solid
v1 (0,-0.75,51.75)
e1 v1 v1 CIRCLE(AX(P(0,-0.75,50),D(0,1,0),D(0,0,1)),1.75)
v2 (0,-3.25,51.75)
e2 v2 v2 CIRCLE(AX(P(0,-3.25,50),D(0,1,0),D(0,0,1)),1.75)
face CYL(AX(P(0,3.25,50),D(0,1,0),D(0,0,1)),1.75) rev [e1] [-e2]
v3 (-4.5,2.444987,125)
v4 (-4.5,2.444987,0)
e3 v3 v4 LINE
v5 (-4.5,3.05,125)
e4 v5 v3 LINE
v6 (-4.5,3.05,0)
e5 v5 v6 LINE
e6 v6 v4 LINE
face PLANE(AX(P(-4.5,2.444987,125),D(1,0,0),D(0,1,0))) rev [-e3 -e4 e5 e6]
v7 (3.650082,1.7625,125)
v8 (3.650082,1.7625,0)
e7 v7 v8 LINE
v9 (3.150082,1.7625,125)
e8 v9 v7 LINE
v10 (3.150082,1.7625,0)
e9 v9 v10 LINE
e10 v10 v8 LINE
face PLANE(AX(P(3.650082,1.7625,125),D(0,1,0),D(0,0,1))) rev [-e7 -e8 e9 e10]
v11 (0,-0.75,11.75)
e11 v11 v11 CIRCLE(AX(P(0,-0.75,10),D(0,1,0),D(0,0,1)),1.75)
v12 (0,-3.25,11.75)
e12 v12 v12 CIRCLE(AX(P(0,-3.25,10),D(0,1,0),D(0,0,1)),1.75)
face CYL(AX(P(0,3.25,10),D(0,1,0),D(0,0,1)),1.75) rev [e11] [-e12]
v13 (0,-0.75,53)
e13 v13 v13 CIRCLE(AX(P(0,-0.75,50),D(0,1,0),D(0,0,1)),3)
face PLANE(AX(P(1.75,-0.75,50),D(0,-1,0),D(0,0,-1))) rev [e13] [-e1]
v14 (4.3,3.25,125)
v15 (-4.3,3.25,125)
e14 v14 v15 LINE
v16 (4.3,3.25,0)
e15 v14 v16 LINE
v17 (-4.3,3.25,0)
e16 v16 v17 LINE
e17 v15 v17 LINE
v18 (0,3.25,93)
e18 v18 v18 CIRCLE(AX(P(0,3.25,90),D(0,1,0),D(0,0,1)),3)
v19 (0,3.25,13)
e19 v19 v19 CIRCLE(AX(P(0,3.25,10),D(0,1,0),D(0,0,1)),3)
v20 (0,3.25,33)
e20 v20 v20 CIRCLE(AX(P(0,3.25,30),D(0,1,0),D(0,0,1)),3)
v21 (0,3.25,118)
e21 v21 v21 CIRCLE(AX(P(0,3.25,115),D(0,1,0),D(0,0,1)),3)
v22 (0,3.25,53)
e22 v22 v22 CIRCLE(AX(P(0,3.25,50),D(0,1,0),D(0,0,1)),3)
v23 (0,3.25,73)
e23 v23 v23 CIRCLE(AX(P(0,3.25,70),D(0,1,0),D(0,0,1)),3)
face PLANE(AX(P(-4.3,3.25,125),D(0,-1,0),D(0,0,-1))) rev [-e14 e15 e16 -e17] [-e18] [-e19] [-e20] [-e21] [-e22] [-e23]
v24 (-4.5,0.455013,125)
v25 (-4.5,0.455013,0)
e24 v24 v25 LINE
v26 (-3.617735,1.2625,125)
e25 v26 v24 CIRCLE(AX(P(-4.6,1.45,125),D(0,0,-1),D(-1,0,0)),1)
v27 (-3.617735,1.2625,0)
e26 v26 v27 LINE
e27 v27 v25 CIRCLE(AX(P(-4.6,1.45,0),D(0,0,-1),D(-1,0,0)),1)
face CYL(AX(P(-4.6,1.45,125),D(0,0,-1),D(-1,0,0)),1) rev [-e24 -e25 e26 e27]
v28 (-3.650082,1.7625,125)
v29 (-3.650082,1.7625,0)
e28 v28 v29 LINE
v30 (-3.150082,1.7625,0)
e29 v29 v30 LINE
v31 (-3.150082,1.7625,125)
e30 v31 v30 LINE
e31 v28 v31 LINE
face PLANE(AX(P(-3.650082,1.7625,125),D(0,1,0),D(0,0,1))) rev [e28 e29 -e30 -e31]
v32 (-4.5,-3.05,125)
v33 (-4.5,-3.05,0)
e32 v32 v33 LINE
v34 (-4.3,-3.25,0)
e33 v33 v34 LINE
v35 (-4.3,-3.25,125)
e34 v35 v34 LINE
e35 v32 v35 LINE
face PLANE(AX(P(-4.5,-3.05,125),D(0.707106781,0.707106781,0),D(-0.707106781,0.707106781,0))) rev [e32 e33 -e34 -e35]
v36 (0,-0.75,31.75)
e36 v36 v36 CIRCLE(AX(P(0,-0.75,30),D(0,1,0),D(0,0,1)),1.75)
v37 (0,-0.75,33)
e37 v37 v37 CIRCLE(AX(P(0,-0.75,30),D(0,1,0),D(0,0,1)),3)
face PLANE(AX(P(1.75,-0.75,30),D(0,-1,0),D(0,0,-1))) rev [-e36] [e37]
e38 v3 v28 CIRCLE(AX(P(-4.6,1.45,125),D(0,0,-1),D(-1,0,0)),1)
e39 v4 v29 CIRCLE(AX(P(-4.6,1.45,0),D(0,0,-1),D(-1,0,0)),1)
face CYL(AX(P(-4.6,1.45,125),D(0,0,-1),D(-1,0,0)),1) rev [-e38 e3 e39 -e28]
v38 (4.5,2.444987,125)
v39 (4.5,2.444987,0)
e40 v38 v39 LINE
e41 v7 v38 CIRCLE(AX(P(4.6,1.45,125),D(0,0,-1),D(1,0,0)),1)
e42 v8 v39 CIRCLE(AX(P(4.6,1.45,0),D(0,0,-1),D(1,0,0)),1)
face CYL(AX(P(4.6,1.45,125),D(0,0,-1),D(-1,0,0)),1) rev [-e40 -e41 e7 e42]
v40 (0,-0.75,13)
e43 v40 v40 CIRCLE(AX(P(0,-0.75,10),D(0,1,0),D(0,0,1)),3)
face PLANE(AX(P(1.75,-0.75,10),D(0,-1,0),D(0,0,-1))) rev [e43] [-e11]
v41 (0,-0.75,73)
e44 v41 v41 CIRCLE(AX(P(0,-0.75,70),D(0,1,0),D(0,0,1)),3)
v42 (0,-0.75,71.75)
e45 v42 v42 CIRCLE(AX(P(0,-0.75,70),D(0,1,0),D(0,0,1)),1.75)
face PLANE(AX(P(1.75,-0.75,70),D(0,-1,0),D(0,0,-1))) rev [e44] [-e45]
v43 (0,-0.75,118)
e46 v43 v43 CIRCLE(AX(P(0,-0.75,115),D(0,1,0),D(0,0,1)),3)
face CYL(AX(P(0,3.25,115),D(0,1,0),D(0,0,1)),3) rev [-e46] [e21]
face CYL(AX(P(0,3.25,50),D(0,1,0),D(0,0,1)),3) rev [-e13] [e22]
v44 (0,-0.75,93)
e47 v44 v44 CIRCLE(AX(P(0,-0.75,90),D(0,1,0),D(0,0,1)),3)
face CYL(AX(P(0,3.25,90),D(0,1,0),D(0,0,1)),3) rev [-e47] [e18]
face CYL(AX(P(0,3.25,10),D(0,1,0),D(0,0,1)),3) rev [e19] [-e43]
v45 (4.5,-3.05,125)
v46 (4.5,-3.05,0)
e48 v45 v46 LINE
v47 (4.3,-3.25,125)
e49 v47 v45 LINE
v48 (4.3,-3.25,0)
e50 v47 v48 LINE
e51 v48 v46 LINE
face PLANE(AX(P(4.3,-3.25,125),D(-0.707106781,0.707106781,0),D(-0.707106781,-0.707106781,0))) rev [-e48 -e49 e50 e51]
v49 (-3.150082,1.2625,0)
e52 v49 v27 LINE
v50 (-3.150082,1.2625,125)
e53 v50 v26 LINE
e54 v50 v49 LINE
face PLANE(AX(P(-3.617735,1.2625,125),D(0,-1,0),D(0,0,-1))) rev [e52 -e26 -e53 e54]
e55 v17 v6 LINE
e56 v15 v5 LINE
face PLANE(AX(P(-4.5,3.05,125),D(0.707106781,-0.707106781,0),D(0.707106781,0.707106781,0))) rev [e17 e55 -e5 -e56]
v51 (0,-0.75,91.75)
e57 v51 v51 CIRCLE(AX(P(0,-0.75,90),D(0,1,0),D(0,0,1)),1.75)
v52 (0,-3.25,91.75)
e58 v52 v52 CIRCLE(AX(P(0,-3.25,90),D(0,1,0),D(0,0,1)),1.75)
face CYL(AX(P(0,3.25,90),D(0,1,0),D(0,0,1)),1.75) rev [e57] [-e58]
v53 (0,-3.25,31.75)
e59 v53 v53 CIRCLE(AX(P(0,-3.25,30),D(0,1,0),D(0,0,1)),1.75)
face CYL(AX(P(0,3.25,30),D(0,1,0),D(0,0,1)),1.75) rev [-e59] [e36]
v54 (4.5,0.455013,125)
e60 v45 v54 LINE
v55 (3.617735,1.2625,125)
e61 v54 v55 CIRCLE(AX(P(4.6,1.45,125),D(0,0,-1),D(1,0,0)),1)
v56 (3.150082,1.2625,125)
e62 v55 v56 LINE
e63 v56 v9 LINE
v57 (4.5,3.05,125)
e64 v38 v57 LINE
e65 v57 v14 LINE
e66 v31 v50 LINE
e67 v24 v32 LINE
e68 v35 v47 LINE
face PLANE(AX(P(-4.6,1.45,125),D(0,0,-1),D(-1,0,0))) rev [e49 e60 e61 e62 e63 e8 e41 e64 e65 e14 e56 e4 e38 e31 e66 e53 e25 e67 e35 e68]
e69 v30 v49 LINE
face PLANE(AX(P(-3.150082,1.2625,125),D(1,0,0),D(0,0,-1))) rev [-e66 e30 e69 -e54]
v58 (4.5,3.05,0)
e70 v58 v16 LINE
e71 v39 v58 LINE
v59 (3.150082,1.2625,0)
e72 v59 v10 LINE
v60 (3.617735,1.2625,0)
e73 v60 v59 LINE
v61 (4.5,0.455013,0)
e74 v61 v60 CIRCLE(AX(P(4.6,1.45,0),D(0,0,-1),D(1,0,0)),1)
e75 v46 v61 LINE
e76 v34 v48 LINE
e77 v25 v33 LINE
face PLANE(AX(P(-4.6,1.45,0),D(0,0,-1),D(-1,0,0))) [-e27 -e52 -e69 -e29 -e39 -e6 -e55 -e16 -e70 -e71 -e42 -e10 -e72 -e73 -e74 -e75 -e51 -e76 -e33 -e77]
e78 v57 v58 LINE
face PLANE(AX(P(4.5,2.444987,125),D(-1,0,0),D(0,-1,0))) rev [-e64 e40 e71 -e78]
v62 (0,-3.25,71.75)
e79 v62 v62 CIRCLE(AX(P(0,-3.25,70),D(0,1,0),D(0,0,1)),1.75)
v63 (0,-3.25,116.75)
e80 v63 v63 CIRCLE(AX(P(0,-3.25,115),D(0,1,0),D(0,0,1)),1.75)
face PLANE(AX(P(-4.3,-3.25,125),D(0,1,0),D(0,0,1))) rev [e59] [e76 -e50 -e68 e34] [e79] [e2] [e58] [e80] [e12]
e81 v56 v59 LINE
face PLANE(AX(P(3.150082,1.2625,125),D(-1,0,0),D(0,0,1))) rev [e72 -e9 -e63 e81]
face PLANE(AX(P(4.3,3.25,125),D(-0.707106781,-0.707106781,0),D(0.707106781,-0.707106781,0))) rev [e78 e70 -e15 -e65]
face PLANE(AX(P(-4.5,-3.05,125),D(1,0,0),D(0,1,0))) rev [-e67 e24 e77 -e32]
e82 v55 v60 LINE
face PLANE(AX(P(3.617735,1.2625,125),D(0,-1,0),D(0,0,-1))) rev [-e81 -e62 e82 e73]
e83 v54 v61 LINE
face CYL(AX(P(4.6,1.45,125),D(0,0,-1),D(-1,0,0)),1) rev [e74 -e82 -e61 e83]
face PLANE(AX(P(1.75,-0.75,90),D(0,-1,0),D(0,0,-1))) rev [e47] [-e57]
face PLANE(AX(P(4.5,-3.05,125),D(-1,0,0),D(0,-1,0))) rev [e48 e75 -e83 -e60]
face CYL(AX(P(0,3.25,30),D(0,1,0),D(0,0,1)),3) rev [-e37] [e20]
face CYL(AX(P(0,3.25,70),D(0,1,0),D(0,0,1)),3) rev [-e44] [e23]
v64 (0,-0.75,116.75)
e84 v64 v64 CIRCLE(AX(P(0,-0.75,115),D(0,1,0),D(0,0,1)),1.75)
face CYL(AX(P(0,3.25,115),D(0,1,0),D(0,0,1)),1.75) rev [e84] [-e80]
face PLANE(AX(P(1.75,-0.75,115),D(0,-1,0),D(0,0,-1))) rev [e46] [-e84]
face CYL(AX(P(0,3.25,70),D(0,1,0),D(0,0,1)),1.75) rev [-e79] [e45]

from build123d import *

# Parameters (mm, degrees)
EXTRUDE_RAIL_PROFILE_DEPTH     = 125
CBORE_FOR_M3_SHCS2_D           = 3.5
CBORE_FOR_M3_SHCS2_CBORE_D     = 6
CBORE_FOR_M3_SHCS2_CBORE_DEPTH = 4
FILL_START                     = -0.75
FILL_PATTERN_OUTLINE_R         = 3
FILL_PATTERN_DEPTH             = 4
FILL_START_2                   = -3.25
FILL_PATTERN_2_OUTLINE_R       = 1.75
FILL_PATTERN_2_DEPTH           = 2.5


# Read off the part's stored shape, not the designer's step: Fill Pattern
with BuildPart() as part:
    # Sketch1 → Extrude Rail Profile (new body)
    with BuildSketch(Plane.XY):
        with BuildLine():
            Line((-4.3, -3.25), (4.3, -3.25))
            Line((4.3, -3.25), (4.5, -3.05))
            Line((4.5, -3.05), (4.5, 0.455012563))
            ThreePointArc((4.5, 0.455012563), (3.924845827, 0.712323349), (3.617735397, 1.2625))
            Line((3.617735397, 1.2625), (3.15008224, 1.2625))
            Line((3.15008224, 1.2625), (3.15008224, 1.7625))
            Line((3.15008224, 1.7625), (3.65008224, 1.7625))
            ThreePointArc((3.65008224, 1.7625), (3.973877727, 2.229724887), (4.5, 2.444987437))
            Line((4.5, 2.444987437), (4.5, 3.05))
            Line((4.5, 3.05), (4.3, 3.25))
            Line((4.3, 3.25), (-4.3, 3.25))
            Line((-4.3, 3.25), (-4.5, 3.05))
            Line((-4.5, 3.05), (-4.5, 2.444987437))
            ThreePointArc((-4.5, 2.444987437), (-3.973877727, 2.229724887), (-3.65008224, 1.7625))
            Line((-3.65008224, 1.7625), (-3.15008224, 1.7625))
            Line((-3.15008224, 1.7625), (-3.15008224, 1.2625))
            Line((-3.15008224, 1.2625), (-3.617735397, 1.2625))
            ThreePointArc((-3.617735397, 1.2625), (-3.924845827, 0.712323349), (-4.5, 0.455012563))
            Line((-4.5, 0.455012563), (-4.5, -3.05))
            Line((-4.5, -3.05), (-4.3, -3.25))
        make_face()
    extrude(amount=EXTRUDE_RAIL_PROFILE_DEPTH)

    # CBORE for M3 SHCS2 (through all)
    with Locations(Plane(origin=(0, 3.25, 0), x_dir=(1, 0, 0), z_dir=(0, 1, 0))):
        with Locations((0, -10)):
            cbore_for_m3_shcs2 = CounterBoreHole(CBORE_FOR_M3_SHCS2_D / 2, CBORE_FOR_M3_SHCS2_CBORE_D / 2, CBORE_FOR_M3_SHCS2_CBORE_DEPTH)

    # Mirror 2: CBORE for M3 SHCS2 across plane
    add(cbore_for_m3_shcs2.mirror(Plane.XY.offset(62.5)), mode=Mode.SUBTRACT)

    # Fill Pattern outline → Fill Pattern (cut)
    with BuildSketch(Plane(origin=(0, 0, 0), x_dir=(1, 0, 0), z_dir=(0, 1, 0)).offset(FILL_START)):
        with Locations((0, -30)):
            Circle(FILL_PATTERN_OUTLINE_R)
        with Locations((0, -50)):
            Circle(FILL_PATTERN_OUTLINE_R)
        with Locations((0, -70)):
            Circle(FILL_PATTERN_OUTLINE_R)
        with Locations((0, -90)):
            Circle(FILL_PATTERN_OUTLINE_R)
    extrude(amount=FILL_PATTERN_DEPTH, mode=Mode.SUBTRACT)

    # Fill Pattern 2 outline → Fill Pattern 2 (cut)
    with BuildSketch(Plane(origin=(0, 0, 0), x_dir=(1, 0, 0), z_dir=(0, 1, 0)).offset(FILL_START_2)):
        with Locations((0, -30)):
            Circle(FILL_PATTERN_2_OUTLINE_R)
        with Locations((0, -50)):
            Circle(FILL_PATTERN_2_OUTLINE_R)
        with Locations((0, -70)):
            Circle(FILL_PATTERN_2_OUTLINE_R)
        with Locations((0, -90)):
            Circle(FILL_PATTERN_2_OUTLINE_R)
    extrude(amount=FILL_PATTERN_2_DEPTH, mode=Mode.SUBTRACT)


solid = part.part
